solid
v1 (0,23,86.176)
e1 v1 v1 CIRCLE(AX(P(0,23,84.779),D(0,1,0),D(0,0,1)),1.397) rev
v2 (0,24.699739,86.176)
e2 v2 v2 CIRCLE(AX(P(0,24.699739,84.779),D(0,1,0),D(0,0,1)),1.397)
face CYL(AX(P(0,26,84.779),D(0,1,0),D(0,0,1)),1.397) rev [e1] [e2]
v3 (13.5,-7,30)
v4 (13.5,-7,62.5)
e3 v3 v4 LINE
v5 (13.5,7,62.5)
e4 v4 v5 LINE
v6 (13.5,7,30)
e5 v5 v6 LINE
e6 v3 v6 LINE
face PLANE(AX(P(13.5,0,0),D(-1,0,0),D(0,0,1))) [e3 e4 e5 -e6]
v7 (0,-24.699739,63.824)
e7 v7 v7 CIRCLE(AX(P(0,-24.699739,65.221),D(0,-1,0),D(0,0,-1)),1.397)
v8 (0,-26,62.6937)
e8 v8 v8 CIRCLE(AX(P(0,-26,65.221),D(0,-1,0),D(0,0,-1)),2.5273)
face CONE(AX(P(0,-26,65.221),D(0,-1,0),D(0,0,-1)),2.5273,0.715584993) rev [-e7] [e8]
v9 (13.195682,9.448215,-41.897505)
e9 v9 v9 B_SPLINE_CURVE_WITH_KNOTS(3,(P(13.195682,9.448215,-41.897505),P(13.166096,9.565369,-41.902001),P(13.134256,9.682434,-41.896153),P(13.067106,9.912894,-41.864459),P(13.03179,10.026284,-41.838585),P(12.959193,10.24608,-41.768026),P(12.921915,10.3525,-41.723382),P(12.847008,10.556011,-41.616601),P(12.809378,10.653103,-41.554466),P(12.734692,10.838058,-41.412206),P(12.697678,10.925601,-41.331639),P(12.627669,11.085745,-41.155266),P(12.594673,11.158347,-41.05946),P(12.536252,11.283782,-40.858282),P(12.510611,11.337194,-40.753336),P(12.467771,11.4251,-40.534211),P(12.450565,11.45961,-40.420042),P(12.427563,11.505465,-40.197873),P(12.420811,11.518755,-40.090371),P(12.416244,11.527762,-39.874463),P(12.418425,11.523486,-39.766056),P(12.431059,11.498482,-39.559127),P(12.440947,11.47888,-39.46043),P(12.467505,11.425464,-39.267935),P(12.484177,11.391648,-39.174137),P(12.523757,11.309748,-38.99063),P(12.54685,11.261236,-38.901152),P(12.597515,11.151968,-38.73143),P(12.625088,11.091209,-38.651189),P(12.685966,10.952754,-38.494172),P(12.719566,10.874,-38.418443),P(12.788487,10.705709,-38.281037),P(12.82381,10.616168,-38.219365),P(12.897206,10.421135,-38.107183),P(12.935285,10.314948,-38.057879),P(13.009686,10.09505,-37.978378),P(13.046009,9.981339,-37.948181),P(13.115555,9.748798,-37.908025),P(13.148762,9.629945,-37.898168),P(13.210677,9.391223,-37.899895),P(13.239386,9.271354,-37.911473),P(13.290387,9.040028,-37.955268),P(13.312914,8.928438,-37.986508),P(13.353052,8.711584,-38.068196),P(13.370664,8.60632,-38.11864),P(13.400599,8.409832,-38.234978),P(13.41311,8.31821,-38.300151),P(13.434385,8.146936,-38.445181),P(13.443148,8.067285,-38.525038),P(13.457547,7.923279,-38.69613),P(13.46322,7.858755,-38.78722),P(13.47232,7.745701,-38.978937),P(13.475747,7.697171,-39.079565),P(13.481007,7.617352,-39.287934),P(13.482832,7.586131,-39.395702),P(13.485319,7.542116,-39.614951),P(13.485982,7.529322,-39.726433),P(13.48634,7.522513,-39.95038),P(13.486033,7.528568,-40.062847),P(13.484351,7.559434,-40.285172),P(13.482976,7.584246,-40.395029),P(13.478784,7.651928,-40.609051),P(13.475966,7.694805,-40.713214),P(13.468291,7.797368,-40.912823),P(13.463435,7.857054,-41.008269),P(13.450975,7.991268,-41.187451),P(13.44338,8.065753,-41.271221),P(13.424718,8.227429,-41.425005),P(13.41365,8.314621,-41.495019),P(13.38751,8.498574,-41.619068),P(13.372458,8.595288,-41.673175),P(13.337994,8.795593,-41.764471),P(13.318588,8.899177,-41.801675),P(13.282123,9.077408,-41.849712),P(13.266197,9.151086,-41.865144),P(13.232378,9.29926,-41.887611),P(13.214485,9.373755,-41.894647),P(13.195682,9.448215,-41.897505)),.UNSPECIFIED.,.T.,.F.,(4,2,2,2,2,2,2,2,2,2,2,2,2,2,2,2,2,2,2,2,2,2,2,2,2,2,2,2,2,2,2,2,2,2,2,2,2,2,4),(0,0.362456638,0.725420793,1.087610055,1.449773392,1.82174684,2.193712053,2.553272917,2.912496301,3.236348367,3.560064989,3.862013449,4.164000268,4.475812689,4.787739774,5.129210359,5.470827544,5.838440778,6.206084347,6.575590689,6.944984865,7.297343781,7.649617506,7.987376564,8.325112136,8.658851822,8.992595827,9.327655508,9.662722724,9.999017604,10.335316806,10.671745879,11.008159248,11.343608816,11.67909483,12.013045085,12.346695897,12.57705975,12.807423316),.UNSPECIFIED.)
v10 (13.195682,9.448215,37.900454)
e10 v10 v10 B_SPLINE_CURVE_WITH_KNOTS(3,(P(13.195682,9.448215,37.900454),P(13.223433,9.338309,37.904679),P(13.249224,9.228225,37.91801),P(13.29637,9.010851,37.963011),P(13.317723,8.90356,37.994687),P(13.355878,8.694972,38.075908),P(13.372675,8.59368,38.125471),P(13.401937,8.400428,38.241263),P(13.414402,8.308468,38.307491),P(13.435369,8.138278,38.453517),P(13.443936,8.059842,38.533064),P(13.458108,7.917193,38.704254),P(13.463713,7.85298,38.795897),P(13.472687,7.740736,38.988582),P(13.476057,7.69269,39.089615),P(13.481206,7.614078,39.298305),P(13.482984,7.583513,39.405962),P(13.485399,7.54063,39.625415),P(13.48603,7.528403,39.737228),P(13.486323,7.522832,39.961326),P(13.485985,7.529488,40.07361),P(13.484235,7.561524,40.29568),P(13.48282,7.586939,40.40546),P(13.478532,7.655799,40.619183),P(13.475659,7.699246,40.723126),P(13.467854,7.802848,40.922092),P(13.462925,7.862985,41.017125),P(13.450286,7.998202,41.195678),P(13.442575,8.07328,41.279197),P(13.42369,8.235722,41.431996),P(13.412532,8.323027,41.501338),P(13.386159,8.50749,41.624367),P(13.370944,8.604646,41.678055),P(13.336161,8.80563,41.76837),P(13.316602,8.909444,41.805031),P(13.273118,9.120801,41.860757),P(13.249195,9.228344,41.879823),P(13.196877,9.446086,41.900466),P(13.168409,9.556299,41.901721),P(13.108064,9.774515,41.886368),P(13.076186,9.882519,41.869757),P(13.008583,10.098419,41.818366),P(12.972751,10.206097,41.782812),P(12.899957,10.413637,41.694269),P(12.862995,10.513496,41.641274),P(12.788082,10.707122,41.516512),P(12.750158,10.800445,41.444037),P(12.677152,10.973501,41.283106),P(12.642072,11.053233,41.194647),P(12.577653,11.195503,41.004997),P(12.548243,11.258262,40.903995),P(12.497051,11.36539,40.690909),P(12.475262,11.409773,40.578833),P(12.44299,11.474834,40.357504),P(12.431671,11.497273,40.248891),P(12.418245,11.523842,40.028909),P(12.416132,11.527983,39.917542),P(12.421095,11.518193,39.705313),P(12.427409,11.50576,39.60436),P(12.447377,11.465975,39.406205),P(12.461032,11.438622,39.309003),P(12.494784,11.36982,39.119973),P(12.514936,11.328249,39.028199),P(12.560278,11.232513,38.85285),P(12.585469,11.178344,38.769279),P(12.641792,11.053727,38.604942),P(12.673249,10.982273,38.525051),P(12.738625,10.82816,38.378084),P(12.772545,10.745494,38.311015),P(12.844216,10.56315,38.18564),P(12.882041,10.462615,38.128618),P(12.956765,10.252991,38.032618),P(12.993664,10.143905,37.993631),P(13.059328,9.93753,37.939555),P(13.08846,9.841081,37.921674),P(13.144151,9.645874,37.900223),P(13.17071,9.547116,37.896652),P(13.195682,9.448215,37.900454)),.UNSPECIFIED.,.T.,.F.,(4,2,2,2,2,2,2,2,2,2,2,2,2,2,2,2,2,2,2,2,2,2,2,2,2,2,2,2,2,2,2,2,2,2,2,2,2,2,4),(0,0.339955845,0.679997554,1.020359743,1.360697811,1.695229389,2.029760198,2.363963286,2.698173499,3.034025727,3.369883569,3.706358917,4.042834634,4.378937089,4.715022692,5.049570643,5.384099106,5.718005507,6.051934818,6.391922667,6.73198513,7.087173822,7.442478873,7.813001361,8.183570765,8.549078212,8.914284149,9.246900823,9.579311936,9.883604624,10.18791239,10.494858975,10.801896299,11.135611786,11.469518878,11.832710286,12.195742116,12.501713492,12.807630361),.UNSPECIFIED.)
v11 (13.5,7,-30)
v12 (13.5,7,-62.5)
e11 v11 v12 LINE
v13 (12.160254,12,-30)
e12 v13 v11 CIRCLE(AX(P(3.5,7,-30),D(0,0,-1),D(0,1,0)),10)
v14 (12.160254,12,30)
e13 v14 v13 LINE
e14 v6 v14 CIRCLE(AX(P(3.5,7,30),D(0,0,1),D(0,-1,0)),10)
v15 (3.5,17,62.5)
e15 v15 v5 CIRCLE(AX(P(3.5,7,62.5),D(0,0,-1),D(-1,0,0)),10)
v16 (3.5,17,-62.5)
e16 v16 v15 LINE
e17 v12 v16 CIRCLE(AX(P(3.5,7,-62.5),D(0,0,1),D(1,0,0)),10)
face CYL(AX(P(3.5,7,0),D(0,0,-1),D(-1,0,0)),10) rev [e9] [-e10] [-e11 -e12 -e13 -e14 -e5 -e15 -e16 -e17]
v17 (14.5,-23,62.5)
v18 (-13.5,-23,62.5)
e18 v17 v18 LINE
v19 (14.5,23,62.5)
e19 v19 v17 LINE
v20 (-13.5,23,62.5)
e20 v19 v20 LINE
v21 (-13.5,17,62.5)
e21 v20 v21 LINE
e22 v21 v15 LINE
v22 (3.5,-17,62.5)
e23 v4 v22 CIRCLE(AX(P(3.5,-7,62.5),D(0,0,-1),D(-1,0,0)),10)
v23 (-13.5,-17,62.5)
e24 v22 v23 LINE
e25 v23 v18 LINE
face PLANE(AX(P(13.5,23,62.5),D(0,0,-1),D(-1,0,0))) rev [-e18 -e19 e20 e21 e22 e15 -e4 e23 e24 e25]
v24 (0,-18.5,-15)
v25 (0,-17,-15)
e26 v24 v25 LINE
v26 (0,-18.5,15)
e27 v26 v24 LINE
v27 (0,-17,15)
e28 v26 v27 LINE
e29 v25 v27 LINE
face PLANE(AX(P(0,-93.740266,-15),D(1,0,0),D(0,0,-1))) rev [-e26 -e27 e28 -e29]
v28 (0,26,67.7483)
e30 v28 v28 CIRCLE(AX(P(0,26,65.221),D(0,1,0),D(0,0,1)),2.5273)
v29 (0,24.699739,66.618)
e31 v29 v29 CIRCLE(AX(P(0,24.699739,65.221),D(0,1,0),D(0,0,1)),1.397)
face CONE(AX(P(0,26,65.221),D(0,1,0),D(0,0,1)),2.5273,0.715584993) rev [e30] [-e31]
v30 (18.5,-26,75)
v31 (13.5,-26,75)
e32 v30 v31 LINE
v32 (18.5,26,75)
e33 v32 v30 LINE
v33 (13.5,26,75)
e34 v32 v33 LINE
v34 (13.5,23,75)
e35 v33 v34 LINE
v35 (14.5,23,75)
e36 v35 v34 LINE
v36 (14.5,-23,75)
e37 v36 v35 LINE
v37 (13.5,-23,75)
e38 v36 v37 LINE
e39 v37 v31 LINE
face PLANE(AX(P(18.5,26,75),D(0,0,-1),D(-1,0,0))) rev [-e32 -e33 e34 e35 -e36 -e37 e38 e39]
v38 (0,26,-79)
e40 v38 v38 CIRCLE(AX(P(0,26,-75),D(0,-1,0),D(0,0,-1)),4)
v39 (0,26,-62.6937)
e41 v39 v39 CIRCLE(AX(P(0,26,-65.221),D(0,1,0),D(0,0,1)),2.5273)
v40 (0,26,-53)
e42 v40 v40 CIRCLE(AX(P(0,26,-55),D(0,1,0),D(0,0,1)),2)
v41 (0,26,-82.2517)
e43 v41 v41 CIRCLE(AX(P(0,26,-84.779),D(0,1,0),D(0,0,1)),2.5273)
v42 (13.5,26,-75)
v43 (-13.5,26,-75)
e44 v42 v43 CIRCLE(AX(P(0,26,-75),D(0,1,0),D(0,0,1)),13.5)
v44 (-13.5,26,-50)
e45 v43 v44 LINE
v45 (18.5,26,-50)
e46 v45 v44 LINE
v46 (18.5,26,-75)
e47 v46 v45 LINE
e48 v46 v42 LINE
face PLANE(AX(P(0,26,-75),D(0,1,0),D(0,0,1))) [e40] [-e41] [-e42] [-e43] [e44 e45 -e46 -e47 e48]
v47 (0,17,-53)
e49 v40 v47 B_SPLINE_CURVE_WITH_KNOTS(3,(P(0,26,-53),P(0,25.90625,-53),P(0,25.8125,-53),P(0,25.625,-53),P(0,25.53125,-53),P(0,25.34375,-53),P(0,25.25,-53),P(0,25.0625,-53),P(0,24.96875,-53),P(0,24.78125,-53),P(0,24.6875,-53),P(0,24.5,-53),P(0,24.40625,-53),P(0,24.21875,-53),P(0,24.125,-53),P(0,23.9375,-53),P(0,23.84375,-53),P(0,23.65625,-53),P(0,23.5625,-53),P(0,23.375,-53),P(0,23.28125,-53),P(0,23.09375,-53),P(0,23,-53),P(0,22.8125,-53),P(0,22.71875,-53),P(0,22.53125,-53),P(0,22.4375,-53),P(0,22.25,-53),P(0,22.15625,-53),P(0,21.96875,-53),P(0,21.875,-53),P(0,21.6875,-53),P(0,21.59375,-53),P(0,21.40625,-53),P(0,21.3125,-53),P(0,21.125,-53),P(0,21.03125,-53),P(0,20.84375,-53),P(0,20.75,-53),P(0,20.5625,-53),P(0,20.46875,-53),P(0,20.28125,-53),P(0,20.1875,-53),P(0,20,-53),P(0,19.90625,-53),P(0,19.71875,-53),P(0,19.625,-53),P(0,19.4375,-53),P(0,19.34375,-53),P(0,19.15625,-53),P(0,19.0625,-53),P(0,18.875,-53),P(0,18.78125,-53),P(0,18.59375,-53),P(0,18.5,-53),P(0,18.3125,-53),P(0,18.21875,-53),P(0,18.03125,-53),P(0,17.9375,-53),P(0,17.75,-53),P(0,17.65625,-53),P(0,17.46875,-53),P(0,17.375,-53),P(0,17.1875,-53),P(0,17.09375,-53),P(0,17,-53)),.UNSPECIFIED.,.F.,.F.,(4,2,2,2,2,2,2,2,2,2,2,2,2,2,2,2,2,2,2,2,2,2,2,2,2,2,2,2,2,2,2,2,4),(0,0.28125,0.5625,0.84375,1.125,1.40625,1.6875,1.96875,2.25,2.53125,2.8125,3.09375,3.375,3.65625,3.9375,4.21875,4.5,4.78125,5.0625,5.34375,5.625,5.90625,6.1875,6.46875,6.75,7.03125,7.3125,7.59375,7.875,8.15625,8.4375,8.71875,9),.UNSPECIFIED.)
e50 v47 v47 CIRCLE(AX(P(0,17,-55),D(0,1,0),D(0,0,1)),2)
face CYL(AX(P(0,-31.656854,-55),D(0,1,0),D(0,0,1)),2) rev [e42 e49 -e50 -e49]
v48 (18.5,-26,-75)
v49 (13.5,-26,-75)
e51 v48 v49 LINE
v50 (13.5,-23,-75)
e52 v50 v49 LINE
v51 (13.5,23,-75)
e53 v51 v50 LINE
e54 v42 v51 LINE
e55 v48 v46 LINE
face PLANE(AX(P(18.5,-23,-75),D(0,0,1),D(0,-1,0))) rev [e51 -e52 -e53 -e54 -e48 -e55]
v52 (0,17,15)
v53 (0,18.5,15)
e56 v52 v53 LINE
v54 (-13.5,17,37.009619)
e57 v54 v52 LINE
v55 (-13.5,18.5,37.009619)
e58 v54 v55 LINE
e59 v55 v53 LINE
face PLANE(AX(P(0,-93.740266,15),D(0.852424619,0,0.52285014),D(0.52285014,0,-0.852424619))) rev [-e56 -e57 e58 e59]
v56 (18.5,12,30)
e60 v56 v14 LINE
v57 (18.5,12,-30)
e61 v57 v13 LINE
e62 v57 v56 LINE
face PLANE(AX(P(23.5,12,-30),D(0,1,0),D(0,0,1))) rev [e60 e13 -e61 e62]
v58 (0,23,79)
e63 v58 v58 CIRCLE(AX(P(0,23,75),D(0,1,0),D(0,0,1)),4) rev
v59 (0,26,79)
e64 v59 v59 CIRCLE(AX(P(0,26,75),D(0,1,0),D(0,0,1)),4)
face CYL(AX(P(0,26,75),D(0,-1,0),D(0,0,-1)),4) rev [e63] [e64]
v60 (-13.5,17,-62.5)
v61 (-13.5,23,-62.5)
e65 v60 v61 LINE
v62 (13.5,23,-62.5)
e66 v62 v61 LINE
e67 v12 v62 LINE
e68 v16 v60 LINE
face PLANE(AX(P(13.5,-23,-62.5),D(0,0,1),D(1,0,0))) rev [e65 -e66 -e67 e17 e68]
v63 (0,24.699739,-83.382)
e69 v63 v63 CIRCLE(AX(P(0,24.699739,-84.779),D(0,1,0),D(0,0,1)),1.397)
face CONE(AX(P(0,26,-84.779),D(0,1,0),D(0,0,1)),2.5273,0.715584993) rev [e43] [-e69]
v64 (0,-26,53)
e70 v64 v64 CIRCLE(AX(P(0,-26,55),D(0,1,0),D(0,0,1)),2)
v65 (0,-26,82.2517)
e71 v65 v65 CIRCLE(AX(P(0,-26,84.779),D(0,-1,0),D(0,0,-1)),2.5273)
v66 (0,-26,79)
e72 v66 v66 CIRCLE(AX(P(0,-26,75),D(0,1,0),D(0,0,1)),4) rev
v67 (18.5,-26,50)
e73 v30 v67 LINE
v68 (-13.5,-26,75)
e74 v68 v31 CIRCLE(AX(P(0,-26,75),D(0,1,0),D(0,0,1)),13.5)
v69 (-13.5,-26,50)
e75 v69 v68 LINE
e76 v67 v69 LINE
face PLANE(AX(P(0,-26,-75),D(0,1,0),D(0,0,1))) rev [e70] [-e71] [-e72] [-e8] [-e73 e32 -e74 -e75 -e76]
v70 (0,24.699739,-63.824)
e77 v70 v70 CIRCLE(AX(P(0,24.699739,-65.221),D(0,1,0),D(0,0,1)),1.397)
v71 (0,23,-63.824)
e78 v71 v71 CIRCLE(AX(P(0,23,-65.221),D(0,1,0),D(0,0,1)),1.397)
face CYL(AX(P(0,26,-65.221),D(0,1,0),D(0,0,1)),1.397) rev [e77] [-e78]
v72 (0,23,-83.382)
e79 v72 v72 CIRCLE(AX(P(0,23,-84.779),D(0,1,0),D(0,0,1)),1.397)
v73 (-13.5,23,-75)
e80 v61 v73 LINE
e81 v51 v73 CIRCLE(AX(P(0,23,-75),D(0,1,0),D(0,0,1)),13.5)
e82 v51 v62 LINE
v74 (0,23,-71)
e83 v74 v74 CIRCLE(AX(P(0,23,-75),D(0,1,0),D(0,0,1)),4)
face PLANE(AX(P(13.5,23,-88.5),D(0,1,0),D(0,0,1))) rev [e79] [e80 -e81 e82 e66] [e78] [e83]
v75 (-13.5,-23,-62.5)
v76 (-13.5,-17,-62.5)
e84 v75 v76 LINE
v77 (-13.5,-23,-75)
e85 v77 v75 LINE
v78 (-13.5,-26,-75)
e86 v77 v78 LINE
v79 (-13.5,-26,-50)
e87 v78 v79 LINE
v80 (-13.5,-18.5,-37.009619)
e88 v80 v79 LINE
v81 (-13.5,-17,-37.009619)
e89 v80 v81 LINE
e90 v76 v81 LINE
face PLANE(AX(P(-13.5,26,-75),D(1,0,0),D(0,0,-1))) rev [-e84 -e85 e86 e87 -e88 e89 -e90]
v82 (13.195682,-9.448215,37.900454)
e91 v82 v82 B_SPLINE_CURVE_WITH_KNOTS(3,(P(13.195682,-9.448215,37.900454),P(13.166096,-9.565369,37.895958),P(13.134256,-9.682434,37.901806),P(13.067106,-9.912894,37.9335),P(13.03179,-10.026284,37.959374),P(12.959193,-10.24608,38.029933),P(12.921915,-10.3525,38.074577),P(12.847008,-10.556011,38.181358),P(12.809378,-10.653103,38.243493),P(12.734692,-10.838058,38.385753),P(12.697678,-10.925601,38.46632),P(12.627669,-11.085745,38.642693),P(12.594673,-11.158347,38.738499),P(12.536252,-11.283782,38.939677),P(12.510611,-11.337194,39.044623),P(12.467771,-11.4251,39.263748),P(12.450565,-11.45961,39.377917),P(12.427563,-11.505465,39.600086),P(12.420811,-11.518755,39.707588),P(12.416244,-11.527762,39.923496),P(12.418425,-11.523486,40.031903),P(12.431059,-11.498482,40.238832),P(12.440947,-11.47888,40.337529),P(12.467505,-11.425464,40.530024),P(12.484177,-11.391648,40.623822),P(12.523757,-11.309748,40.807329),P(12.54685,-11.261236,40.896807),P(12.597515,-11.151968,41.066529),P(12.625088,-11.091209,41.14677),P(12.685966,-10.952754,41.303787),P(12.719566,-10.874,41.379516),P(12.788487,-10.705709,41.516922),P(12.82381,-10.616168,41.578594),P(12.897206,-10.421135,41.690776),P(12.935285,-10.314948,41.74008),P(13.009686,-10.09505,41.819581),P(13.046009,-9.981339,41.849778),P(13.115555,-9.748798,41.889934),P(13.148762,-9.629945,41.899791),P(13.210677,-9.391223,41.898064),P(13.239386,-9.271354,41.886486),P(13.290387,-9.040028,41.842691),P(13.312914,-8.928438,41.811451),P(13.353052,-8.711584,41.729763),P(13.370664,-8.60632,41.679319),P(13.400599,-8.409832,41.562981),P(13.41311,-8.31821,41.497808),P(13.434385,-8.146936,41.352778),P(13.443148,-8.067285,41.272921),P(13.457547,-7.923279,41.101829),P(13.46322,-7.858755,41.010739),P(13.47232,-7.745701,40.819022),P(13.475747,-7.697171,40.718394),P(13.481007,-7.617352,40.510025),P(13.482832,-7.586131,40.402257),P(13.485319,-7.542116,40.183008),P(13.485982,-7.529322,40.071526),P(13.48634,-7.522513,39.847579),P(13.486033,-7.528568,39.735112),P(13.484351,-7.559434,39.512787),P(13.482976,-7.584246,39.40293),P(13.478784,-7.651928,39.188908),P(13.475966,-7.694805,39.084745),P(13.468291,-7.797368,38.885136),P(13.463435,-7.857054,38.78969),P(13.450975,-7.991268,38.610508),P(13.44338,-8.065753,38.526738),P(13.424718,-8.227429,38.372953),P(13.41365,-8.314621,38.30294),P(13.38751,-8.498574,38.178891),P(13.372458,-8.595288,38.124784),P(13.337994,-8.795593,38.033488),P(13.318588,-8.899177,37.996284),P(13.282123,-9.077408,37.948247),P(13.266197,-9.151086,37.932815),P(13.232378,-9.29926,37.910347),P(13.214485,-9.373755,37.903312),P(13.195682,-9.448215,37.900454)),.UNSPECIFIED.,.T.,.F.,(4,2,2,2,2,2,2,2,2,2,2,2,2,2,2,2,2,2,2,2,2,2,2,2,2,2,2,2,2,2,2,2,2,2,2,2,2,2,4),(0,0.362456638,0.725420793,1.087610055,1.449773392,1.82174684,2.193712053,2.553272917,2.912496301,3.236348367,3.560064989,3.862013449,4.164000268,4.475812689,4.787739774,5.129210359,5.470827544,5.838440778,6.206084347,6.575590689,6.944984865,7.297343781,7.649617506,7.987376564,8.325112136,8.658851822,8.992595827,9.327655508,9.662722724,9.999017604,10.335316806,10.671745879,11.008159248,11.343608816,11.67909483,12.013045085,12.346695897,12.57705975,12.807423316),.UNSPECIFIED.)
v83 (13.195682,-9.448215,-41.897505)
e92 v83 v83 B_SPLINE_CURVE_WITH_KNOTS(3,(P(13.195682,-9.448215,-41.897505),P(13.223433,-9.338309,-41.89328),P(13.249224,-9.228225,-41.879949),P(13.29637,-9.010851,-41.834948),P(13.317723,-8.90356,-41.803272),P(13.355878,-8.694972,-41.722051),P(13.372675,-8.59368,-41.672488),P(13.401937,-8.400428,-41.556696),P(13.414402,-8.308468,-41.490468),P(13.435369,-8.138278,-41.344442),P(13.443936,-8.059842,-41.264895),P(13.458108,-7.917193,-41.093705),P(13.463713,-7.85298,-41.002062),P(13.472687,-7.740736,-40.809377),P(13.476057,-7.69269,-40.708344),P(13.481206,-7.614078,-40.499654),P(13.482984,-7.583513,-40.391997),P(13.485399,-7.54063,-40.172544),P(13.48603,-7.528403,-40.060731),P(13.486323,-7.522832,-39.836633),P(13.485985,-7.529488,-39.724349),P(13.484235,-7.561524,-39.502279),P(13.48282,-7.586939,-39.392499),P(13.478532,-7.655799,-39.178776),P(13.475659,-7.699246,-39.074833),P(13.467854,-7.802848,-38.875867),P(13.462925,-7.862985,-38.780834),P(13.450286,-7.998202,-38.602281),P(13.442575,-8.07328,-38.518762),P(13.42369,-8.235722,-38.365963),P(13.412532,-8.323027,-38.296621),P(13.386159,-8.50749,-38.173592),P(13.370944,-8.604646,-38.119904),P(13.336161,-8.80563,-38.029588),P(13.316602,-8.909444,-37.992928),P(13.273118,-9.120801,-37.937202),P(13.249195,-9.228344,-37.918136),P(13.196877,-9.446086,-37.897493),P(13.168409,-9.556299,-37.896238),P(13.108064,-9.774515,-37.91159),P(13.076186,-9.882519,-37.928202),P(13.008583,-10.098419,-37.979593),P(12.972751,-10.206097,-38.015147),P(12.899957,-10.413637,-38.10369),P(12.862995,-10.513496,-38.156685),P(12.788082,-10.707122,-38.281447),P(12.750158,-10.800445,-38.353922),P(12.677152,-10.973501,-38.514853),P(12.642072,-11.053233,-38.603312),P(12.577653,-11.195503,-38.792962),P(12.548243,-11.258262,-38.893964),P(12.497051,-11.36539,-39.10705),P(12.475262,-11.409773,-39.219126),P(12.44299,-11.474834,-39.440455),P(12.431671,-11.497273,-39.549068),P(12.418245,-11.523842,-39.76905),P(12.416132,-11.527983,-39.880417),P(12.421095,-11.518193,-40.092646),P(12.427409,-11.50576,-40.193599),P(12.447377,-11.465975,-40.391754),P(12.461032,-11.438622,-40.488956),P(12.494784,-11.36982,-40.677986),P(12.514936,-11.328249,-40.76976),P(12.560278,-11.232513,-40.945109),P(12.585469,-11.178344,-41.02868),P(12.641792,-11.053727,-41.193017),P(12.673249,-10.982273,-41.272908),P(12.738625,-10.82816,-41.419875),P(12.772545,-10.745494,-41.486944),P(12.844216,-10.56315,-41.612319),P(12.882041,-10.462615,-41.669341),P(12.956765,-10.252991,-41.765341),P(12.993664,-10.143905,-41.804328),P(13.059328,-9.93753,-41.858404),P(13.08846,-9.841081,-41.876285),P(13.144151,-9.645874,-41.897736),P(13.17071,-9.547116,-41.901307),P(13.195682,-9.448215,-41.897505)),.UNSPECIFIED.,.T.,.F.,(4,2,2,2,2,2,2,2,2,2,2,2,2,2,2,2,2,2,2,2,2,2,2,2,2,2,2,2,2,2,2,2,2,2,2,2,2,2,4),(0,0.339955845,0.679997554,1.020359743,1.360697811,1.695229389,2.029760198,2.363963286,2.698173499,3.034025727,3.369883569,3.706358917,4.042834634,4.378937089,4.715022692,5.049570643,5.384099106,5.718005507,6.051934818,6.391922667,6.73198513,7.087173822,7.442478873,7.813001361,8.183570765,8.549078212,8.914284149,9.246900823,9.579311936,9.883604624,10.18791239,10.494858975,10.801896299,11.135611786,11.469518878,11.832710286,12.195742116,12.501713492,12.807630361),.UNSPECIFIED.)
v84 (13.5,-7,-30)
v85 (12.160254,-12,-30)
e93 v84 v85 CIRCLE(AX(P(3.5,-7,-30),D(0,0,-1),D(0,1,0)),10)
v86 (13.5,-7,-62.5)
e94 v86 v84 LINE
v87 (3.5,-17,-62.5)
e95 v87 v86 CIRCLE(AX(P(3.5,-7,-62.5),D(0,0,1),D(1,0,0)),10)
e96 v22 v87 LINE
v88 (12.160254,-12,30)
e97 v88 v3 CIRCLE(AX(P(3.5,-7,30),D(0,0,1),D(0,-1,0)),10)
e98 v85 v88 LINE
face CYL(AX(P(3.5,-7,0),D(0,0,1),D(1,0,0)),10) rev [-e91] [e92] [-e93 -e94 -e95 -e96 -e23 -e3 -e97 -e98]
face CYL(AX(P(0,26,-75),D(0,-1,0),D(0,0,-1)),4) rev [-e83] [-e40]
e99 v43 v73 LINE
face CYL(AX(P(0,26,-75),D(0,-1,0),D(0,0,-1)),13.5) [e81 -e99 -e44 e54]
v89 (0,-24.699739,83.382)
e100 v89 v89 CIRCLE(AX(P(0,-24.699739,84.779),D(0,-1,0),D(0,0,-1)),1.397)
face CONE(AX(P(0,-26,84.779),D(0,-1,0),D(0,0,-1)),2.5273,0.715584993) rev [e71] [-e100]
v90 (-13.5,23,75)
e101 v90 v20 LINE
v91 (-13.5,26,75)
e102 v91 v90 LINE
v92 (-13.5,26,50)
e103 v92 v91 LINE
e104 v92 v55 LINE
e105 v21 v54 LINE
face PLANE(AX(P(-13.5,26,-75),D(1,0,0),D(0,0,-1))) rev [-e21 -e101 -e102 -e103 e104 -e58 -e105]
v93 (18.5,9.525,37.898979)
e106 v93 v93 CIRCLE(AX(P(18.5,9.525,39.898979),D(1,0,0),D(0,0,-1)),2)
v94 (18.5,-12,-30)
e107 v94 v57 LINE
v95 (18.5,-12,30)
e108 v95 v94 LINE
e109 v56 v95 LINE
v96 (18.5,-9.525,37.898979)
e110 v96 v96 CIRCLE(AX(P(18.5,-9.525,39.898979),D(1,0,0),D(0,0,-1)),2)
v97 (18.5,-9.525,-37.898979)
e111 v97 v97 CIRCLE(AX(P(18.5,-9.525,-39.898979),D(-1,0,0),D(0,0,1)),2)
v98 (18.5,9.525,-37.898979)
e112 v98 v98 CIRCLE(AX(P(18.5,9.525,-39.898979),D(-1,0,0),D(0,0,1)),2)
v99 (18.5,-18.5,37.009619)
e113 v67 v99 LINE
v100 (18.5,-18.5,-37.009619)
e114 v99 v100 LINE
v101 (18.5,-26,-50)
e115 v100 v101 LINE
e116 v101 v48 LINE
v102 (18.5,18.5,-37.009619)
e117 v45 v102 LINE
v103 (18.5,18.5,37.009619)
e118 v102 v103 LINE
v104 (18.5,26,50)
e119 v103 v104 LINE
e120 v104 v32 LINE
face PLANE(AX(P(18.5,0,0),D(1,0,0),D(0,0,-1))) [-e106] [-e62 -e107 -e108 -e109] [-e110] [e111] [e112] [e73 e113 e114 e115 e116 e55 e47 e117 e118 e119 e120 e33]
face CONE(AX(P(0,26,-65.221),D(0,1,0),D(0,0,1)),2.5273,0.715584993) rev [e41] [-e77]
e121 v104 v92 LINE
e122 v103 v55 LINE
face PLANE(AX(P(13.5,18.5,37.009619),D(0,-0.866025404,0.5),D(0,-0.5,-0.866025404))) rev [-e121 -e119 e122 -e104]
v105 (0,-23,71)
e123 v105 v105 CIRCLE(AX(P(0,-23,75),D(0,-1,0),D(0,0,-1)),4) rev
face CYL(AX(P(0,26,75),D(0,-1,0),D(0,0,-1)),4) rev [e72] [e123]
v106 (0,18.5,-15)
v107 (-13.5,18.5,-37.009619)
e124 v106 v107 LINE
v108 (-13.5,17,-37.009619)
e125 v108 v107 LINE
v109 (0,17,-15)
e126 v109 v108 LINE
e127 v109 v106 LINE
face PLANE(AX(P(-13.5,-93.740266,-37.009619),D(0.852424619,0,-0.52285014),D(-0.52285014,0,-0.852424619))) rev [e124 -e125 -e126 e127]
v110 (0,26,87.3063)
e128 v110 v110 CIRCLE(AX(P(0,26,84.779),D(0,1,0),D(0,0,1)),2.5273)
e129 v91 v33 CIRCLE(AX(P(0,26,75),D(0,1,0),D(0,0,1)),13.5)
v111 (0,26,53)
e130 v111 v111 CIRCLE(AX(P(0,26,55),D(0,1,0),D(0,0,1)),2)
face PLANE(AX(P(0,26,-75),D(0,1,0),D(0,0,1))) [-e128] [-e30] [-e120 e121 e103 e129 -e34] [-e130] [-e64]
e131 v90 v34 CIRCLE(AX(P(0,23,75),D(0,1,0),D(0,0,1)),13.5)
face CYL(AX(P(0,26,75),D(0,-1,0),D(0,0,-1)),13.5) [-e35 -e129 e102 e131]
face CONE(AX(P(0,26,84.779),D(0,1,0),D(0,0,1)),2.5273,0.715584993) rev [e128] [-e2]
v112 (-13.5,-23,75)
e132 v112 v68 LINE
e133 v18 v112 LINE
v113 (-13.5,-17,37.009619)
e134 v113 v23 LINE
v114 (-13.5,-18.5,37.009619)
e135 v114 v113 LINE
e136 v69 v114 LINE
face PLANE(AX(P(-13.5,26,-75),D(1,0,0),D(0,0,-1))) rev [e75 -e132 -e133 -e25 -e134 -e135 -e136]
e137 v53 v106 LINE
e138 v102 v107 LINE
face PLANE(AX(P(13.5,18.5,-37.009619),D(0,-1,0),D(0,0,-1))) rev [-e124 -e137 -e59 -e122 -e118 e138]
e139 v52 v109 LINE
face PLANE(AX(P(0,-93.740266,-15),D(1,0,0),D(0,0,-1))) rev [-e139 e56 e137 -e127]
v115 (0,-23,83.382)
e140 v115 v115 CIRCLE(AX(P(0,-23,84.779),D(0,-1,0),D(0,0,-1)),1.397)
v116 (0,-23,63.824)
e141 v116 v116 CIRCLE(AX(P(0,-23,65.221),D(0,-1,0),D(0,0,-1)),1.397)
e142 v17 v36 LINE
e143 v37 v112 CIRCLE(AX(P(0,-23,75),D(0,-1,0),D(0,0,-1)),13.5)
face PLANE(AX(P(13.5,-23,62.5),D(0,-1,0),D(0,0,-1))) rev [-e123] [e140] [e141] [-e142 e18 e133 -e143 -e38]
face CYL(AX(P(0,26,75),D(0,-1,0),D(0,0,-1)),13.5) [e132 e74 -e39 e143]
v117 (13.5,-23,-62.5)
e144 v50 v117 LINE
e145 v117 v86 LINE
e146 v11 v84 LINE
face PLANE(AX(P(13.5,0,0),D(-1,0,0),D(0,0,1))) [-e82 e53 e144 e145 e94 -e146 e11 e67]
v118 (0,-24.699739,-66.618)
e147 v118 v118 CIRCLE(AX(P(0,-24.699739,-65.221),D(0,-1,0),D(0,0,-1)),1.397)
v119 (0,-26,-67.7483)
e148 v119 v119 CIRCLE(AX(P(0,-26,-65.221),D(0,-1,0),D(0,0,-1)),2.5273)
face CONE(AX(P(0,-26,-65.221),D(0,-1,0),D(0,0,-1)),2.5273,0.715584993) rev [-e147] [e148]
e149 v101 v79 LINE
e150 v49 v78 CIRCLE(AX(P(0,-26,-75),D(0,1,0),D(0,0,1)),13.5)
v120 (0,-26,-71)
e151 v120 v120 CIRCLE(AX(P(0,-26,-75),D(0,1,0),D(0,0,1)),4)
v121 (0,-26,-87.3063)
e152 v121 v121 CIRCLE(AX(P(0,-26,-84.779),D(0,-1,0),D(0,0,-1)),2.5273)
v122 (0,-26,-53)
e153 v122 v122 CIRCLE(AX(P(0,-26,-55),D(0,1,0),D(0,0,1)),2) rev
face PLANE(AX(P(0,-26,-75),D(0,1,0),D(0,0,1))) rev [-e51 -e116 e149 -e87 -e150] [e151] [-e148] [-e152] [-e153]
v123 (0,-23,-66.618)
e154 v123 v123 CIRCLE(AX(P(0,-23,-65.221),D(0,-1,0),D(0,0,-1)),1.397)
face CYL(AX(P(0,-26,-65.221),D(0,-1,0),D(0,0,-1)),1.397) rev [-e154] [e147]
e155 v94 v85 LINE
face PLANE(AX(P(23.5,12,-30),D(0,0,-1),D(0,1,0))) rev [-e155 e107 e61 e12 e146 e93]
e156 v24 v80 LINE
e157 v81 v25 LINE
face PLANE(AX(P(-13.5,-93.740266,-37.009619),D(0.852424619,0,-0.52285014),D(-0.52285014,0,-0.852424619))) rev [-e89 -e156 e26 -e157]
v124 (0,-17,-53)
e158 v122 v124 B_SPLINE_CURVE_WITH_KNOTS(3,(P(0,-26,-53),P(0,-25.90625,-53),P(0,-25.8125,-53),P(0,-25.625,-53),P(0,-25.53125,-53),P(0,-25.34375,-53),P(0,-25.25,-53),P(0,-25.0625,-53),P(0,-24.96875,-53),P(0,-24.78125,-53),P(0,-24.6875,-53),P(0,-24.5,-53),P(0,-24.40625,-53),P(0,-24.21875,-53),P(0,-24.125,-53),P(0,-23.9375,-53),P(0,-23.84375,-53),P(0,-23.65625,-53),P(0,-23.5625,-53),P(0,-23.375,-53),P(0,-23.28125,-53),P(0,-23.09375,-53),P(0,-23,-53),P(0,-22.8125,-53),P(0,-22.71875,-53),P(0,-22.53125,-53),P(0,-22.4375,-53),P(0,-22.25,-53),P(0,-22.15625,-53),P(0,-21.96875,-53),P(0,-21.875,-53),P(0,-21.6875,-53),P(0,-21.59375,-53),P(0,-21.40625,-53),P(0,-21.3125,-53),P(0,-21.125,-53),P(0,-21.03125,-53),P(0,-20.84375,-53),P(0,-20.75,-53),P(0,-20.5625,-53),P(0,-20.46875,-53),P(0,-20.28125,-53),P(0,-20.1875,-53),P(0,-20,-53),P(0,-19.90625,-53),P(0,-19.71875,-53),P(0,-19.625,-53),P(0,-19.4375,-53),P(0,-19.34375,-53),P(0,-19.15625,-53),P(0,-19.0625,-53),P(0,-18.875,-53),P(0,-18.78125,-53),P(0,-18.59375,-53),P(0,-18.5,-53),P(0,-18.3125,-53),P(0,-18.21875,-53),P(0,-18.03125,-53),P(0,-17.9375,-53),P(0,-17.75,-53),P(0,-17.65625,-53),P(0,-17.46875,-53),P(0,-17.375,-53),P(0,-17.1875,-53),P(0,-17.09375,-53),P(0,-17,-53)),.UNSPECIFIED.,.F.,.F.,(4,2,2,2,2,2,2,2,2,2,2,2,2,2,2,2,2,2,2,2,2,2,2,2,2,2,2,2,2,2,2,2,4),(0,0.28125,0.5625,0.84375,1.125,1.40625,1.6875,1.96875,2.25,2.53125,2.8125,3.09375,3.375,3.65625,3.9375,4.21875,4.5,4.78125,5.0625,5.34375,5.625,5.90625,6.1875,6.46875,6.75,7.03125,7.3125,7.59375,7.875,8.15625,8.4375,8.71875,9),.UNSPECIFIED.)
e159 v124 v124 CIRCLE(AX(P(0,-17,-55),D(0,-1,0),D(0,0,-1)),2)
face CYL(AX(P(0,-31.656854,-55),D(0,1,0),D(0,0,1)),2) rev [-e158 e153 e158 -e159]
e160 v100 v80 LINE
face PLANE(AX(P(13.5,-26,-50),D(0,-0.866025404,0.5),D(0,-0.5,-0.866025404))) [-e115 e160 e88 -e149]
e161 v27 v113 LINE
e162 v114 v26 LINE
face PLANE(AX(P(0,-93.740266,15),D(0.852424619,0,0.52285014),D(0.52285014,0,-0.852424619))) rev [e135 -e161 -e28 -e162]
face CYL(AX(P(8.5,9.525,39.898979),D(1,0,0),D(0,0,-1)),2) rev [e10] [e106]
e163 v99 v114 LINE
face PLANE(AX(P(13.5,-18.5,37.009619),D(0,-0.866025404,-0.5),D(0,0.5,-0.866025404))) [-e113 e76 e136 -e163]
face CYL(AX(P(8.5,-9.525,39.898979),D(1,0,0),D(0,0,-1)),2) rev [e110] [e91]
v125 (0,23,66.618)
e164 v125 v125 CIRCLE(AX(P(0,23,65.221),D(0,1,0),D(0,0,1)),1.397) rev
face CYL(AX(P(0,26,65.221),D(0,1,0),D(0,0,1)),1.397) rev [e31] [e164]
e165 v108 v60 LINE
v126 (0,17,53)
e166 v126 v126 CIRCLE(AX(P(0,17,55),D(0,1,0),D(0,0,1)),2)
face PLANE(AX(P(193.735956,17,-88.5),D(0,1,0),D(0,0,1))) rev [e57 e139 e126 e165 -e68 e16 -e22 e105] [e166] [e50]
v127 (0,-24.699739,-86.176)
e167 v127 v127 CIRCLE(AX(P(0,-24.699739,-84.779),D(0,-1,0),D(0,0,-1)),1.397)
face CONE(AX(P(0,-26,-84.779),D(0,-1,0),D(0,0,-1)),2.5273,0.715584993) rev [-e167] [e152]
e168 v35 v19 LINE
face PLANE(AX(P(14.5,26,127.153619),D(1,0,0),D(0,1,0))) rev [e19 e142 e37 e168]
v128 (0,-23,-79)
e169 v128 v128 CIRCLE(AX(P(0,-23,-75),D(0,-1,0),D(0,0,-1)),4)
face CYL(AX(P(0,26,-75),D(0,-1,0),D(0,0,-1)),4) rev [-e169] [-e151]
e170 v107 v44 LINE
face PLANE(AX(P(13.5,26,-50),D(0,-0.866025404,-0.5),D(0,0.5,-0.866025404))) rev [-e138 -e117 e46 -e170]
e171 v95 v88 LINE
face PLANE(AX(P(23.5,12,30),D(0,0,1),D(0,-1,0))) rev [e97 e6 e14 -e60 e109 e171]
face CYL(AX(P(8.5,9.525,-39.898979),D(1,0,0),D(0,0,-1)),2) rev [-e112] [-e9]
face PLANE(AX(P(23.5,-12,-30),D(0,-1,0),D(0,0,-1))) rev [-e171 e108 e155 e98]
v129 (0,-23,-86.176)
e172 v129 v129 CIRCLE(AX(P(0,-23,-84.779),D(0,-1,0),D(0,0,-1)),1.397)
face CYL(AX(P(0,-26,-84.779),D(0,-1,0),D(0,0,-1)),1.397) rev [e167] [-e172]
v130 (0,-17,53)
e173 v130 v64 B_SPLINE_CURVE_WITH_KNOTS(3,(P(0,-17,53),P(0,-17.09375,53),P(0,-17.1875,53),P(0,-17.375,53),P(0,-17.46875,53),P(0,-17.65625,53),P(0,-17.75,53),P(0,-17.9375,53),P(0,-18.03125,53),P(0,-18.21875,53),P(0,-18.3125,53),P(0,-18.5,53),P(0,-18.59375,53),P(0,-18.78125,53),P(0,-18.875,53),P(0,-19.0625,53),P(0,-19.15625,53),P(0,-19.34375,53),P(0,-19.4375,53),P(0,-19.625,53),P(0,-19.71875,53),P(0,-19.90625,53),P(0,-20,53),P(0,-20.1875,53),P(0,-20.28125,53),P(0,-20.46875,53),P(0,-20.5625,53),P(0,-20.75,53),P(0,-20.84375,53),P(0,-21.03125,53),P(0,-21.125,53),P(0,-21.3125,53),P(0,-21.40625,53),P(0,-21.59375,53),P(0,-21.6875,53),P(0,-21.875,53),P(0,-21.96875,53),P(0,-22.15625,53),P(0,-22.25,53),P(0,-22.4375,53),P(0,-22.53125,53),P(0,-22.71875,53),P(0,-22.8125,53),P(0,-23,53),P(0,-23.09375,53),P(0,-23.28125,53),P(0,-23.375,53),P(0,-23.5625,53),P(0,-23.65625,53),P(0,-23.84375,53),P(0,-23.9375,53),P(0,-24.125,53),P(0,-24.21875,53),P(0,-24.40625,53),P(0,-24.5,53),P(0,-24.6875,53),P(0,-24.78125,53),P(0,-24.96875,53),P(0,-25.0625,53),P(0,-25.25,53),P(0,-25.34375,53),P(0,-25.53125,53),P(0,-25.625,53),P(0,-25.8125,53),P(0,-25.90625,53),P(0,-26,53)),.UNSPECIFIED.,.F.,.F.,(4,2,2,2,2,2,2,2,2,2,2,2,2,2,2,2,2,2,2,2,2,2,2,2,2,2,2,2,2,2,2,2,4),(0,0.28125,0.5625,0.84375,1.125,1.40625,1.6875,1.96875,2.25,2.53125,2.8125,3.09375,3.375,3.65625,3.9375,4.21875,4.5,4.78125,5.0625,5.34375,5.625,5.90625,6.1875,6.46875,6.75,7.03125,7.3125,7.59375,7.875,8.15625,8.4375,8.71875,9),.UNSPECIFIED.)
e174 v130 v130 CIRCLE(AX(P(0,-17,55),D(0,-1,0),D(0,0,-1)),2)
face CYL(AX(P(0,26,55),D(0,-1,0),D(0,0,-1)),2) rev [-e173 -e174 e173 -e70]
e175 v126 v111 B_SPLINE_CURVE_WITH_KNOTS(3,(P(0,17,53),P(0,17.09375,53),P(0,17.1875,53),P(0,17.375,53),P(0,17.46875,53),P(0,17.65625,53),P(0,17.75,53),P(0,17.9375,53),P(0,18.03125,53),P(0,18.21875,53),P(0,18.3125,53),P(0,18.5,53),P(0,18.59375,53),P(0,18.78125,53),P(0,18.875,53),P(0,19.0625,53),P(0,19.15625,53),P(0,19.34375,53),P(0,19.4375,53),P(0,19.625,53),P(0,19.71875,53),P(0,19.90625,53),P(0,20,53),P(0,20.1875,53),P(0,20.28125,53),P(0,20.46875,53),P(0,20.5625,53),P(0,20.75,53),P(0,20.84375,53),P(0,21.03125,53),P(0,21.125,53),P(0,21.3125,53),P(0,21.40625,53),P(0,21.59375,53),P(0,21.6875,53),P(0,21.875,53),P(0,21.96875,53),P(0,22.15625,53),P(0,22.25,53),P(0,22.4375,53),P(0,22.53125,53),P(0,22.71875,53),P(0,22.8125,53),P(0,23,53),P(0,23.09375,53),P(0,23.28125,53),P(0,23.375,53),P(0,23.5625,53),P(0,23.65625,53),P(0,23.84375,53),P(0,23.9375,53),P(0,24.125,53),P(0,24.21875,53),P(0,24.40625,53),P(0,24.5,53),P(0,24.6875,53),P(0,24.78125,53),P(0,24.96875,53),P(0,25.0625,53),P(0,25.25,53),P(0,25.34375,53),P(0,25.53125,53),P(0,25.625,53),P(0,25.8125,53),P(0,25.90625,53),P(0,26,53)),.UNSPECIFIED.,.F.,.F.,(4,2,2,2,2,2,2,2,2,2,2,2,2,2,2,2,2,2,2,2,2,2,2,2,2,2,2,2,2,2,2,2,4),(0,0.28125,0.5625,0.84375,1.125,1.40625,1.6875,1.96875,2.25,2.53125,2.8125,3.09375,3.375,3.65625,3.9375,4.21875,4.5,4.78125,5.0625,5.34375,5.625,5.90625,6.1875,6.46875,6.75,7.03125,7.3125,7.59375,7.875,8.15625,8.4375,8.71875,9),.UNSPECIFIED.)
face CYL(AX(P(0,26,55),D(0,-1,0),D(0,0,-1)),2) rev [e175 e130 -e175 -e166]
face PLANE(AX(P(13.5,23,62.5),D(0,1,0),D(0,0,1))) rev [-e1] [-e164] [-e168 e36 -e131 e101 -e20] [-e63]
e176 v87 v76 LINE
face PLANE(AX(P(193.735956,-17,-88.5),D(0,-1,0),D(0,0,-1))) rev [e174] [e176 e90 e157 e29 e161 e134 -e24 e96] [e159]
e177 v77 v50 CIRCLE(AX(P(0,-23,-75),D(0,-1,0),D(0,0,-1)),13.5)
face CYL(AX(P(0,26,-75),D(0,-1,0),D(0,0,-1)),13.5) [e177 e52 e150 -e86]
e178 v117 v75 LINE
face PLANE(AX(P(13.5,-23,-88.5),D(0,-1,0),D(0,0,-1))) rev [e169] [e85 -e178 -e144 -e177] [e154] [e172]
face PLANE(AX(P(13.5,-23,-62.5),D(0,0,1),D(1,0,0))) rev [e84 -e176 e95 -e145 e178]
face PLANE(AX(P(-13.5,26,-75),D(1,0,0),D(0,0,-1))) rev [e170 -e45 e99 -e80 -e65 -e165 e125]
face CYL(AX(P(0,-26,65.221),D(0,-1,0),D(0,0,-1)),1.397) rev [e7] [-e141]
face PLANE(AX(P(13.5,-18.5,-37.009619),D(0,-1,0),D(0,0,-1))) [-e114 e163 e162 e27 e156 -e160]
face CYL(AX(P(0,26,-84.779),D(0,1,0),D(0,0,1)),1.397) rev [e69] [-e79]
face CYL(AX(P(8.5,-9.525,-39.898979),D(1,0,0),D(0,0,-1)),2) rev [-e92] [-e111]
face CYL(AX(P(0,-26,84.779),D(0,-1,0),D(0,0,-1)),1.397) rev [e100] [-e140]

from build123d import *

# Parameters (mm, degrees)
SKETCH1_R                                     = 2
BOSS_EXTRUDE1_DEPTH                           = 26
CUT_EXTRUDE1_DEPTH                            = 97.110613358
CUT_EXTRUDE2_DEPTH                            = 97.110613358
CUT_EXTRUDE2_DEPTH_BACK                       = 97.110613358
SKETCH4_W                                     = 26
SKETCH4_H                                     = 6
SKETCH5_W                                     = 177
SKETCH5_H                                     = 34
CUT_EXTRUDE3_DEPTH                            = 22
SKETCH6_W                                     = 22.988088482
SKETCH6_H                                     = 34
CUT_EXTRUDE4_DEPTH                            = 95.827474922
SKETCH7_W                                     = 22.988088482
SKETCH7_H                                     = 34
CUT_EXTRUDE5_DEPTH                            = 95.827474922
CSK_FOR_3_FLAT_HEAD_MACHINE_SCREW1_AT_2_COUNT = 2
CSK_FOR_3_FLAT_HEAD_MACHINE_SCREW1_AT_2_PITCH = 19.558
SKETCH13_R                                    = 4
CUT_EXTRUDE6_DEPTH                            = 104.530188834
BOSS_EXTRUDE2_DEPTH                           = 5
SKETCH15_W                                    = 125
SKETCH15_H                                    = 34
CUT_EXTRUDE7_DEPTH                            = 5
SKETCH17_W                                    = 4
SKETCH17_H                                    = 52
BOSS_EXTRUDE4_DEPTH                           = 12.5
SKETCH19_R                                    = 2
CUT_EXTRUDE11_DEPTH                           = 10
CUT_EXTRUDE8_REACH                            = 106.3
SKETCH18_R                                    = 2
SKETCH20_W                                    = 60
SKETCH20_H                                    = 24
CUT_EXTRUDE10_DEPTH                           = 10
CUT_EXTRUDE12_REACH                           = 102.771
SKETCH22_W                                    = 5
SKETCH22_H                                    = 46
BOSS_EXTRUDE5_DEPTH                           = 12.5
FILLET1_R                                     = 10


with BuildPart() as part:
    # Sketch1 → Boss-Extrude1 (new, symmetric)
    with BuildSketch(Plane(origin=(0, 0, 0), x_dir=(1, 0, 0), z_dir=(0, 1, 0))):
        with BuildLine():
            Line((-13.5, 75), (-13.5, -75))
            ThreePointArc((-13.5, -75), (0, -88.5), (13.5, -75))
            Line((13.5, -75), (13.5, 75))
            ThreePointArc((13.5, 75), (0, 88.5), (-13.5, 75))
        make_face()
        with Locations(Location((0, -55, 0), (0, 0, 90))):
            Circle(SKETCH1_R, mode=Mode.SUBTRACT)
    extrude(amount=BOSS_EXTRUDE1_DEPTH, both=True)

    # Sketch3 → Cut-Extrude1 (cut, symmetric)
    with BuildSketch(Plane.ZY.offset(13.5)):
        Polygon((-50, 26), (-37.009618943, 18.5), (37.009618943, 18.5), (50, 26), align=None)
    cut_extrude1 = extrude(amount=CUT_EXTRUDE1_DEPTH, both=True, mode=Mode.SUBTRACT)

    # Mirror1: Cut-Extrude1 across plane
    add(cut_extrude1.mirror(Plane.ZX), mode=Mode.SUBTRACT)

    # Sketch4 → Cut-Extrude2 (cut, two sides: drawn at the far end of the back side and taken through both)
    with BuildSketch(Plane.ZY.offset(13.5).offset(-CUT_EXTRUDE2_DEPTH_BACK)):
        with Locations((75.5, 20)):
            Rectangle(SKETCH4_W, SKETCH4_H)
        with Locations((-75.5, 20)):
            Rectangle(SKETCH4_W, SKETCH4_H)
        with Locations((-75.5, -20)):
            Rectangle(SKETCH4_W, SKETCH4_H)
        with Locations((75.5, -20)):
            Rectangle(SKETCH4_W, SKETCH4_H)
    extrude(amount=CUT_EXTRUDE2_DEPTH + CUT_EXTRUDE2_DEPTH_BACK, mode=Mode.SUBTRACT)

    # Sketch5 → Cut-Extrude3 (cut)
    with BuildSketch(Plane.ZY.offset(13.5)):
        Rectangle(SKETCH5_W, SKETCH5_H)
    extrude(amount=-CUT_EXTRUDE3_DEPTH, mode=Mode.SUBTRACT)

    # Sketch6 → Cut-Extrude4 (cut, through all)
    with BuildSketch(Plane.ZY.offset(-8.5)):
        with Locations((73.994044241, 0)):
            Rectangle(SKETCH6_W, SKETCH6_H)
    extrude(amount=-CUT_EXTRUDE4_DEPTH, mode=Mode.SUBTRACT)

    # Sketch7 → Cut-Extrude5 (cut, through all)
    with BuildSketch(Plane.ZY.offset(-8.5)):
        with Locations((-73.994044241, 0)):
            Rectangle(SKETCH7_W, SKETCH7_H)
    extrude(amount=-CUT_EXTRUDE5_DEPTH, mode=Mode.SUBTRACT)

    # Sketch12 → CSK for #3 Flat Head Machine Screw1 (revolve, cut)
    with BuildSketch(Plane(origin=(0, 26, 65.221), x_dir=(0, 0, 1), z_dir=(1, 0, 0))):
        Polygon((0, 0), (0, 3.839402285), (1.397, 3), (1.397, 1.300261411), (2.5273, 0), align=None)
    csk_for_3_flat_head_machine_screw1 = revolve(axis=Axis((0, 32.35, 65.221), (0, -1, 0)), mode=Mode.SUBTRACT)

    # CSK for #3 Flat Head Machine Screw1 at 2: CSK for #3 Flat Head Machine Screw1 ×2
    with Locations(*[(0, 0, i * CSK_FOR_3_FLAT_HEAD_MACHINE_SCREW1_AT_2_PITCH) for i in range(1, CSK_FOR_3_FLAT_HEAD_MACHINE_SCREW1_AT_2_COUNT)]):
        add(csk_for_3_flat_head_machine_screw1, mode=Mode.SUBTRACT)

    # Mirror5: CSK for #3 Flat Head Machine Screw1 across plane
    add(csk_for_3_flat_head_machine_screw1.mirror(Plane.ZX), mode=Mode.SUBTRACT)

    # Mirror5 copy 1 sketch → Mirror5 copy 1 (revolve, cut)
    with BuildSketch(Plane(origin=(0, -26, 84.779), x_dir=(0, 0, 1), z_dir=(1, 0, 0))):
        Polygon((0, 0), (0, -3.839402285), (1.397, -3), (1.397, -1.300261411), (2.5273, 0), align=None)
    revolve(axis=Axis((0, -32.35, 84.779), (0, -1, 0)), mode=Mode.SUBTRACT)

    # Mirror3: CSK for #3 Flat Head Machine Screw1 across plane
    add(csk_for_3_flat_head_machine_screw1.mirror(Plane.XY), mode=Mode.SUBTRACT)

    # Mirror3 copy 1 sketch → Mirror3 copy 1 (revolve, cut)
    with BuildSketch(Plane(origin=(0, 26, -84.779), x_dir=(0, 0, -1), z_dir=(1, 0, 0))):
        Polygon((0, 0), (0, -3.839402285), (1.397, -3), (1.397, -1.300261411), (2.5273, 0), align=None)
    revolve(axis=Axis((0, 32.35, -84.779), (0, 1, 0)), mode=Mode.SUBTRACT)

    # Sketch13 → Cut-Extrude6 (cut, symmetric)
    with BuildSketch(Plane.XZ.offset(26)):
        with Locations(Location((0, -75, 0), (0, 0, 270))):
            Circle(SKETCH13_R)
    cut_extrude6 = extrude(amount=CUT_EXTRUDE6_DEPTH, both=True, mode=Mode.SUBTRACT)

    # Mirror4: Cut-Extrude6 across plane
    add(cut_extrude6.mirror(Plane.XY), mode=Mode.SUBTRACT)

    # Sketch14 → Boss-Extrude2 (add)
    with BuildSketch(Plane(origin=(13.5, 0, 0), x_dir=(0, 0, -1), z_dir=(1, 0, 0))):
        Polygon((-75, 26), (-75, 23), (-62.5, 23), (-62.5, -23), (-75, -23), (-75, -26), (-50, -26), (-37.009618943, -18.5), (37.009618943, -18.5), (50, -26), (75, -26), (75, -23), (62.5, -23), (62.5, 23), (75, 23), (75, 26), (50, 26), (37.009618943, 18.5), (-37.009618943, 18.5), (-50, 26), align=None)
    extrude(amount=BOSS_EXTRUDE2_DEPTH)

    # Sketch15 → Cut-Extrude7 (cut)
    with BuildSketch(Plane.ZY.offset(-8.5)):
        Rectangle(SKETCH15_W, SKETCH15_H)
    extrude(amount=-CUT_EXTRUDE7_DEPTH, mode=Mode.SUBTRACT)

    # Sketch17 → Boss-Extrude4 (add)
    with BuildSketch(Plane.XY.offset(62.5)):
        with Locations((16.5, 0)):
            Rectangle(SKETCH17_W, SKETCH17_H)
    extrude(amount=BOSS_EXTRUDE4_DEPTH)

    # Mirror6 copy 1 sketch → Mirror6 copy 1 (revolve, cut)
    with BuildSketch(Plane(origin=(0, -26, -65.221), x_dir=(0, 0, -1), z_dir=(1, 0, 0))):
        Polygon((0, 0), (0, 3.839402285), (1.397, 3), (1.397, 1.300261411), (2.5273, 0), align=None)
    revolve(axis=Axis((0, -32.35, -65.221), (0, 1, 0)), mode=Mode.SUBTRACT)

    # Mirror6 copy 2 sketch → Mirror6 copy 2 (revolve, cut)
    with BuildSketch(Plane(origin=(0, -26, -84.779), x_dir=(0, 0, -1), z_dir=(1, 0, 0))):
        Polygon((0, 0), (0, 3.839402285), (1.397, 3), (1.397, 1.300261411), (2.5273, 0), align=None)
    revolve(axis=Axis((0, -32.35, -84.779), (0, 1, 0)), mode=Mode.SUBTRACT)

    # Mirror6 copy 3 sketch → Mirror6 copy 3 (revolve, cut)
    with BuildSketch(Plane(origin=(0, -26, 65.221), x_dir=(0, 0, 1), z_dir=(1, 0, 0))):
        Polygon((0, 0), (0, -3.839402285), (1.397, -3), (1.397, -1.300261411), (2.5273, 0), align=None)
    revolve(axis=Axis((0, -32.35, 65.221), (0, -1, 0)), mode=Mode.SUBTRACT)

    # Mirror6 copy 4 sketch → Mirror6 copy 4 (revolve, cut)
    with BuildSketch(Plane(origin=(0, -26, 84.779), x_dir=(0, 0, 1), z_dir=(1, 0, 0))):
        Polygon((0, 0), (0, -3.839402285), (1.397, -3), (1.397, -1.300261411), (2.5273, 0), align=None)
    revolve(axis=Axis((0, -32.35, 84.779), (0, -1, 0)), mode=Mode.SUBTRACT)

    # Sketch19 → Cut-Extrude11 (cut)
    with BuildSketch(Plane(origin=(18.5, 0, 0), x_dir=(0, 0, -1), z_dir=(1, 0, 0))):
        with Locations((-39.898979486, 9.525)):
            Circle(SKETCH19_R)
        with Locations((-39.898979486, -9.525)):
            Circle(SKETCH19_R)
    cut_extrude11 = extrude(amount=-CUT_EXTRUDE11_DEPTH, mode=Mode.SUBTRACT)

    # Cut-Extrude8: up to this face of the body (flat: up to its plane)
    cut_extrude8_end = Plane(part.part.faces().sort_by_distance((0, -26, -87.99937539))[0])
    # Sketch18 → Cut-Extrude8 (cut, up to the picked face)
    with BuildSketch(Plane(origin=(0, 26, 0), x_dir=(1, 0, 0), z_dir=(0, 1, 0)), mode=Mode.PRIVATE) as cut_extrude8_sk1:
        with Locations(Location((0, 55, 0), (0, 0, 270))):
            Circle(SKETCH18_R)
    cut_extrude8_tool1 = split(extrude(cut_extrude8_sk1.sketch, amount=-CUT_EXTRUDE8_REACH, mode=Mode.PRIVATE), bisect_by=cut_extrude8_end, keep=Keep.BOTH, mode=Mode.PRIVATE)
    add(cut_extrude8_tool1.solids().sort_by(Axis((0, 26, -55), (0, -1, 0)))[0], mode=Mode.SUBTRACT)

    # Sketch20 → Cut-Extrude10 (cut)
    with BuildSketch(Plane.ZY.offset(-13.5)):
        Rectangle(SKETCH20_W, SKETCH20_H)
    extrude(amount=-CUT_EXTRUDE10_DEPTH, mode=Mode.SUBTRACT)

    # Mirror7: Cut-Extrude11 across plane
    add(cut_extrude11.mirror(Plane.XY), mode=Mode.SUBTRACT)

    # Sketch21 → Cut-Extrude12 (cut, up to next)
    with BuildSketch(Plane(origin=(0, 18.5, 0), x_dir=(1, 0, 0), z_dir=(0, 1, 0)), mode=Mode.PRIVATE) as cut_extrude12_sk1:
        Polygon((-13.5, 37.009618943), (0, 15), (0, -15), (-13.5, -37.009618943), align=None)
    cut_extrude12_tool1 = extrude(cut_extrude12_sk1.sketch, amount=-CUT_EXTRUDE12_REACH, mode=Mode.PRIVATE) & part.part
    add(cut_extrude12_tool1.solids().sort_by_distance((-7.702163, 18.5, 0))[0], mode=Mode.SUBTRACT)
    add(cut_extrude12_tool1.solids().sort_by_distance((-7.702163, 18.5, 0))[1], mode=Mode.SUBTRACT)

    # Sketch22 → Boss-Extrude5 (add)
    with BuildSketch(Plane(origin=(0, 0, -62.5), x_dir=(-1, 0, 0), z_dir=(0, 0, -1))):
        with Locations((-16, 0)):
            Rectangle(SKETCH22_W, SKETCH22_H)
    extrude(amount=BOSS_EXTRUDE5_DEPTH)

    # Fillet1
    # the kernel refuses this fillet: 10 mm, written as the material it adds along each edge
    with BuildSketch(Plane(origin=(13.5, 17, -62.5), x_dir=(0, -1, 0), z_dir=(0, 0, 1))) as fillet1_piece_1_section:
        with BuildLine():
            CenterArc((FILLET1_R, -FILLET1_R), FILLET1_R, 90, 90)
            Line((0, -FILLET1_R), (0, 0))
            Line((0, 0), (FILLET1_R, 0))
        make_face()
    fillet1_piece_1 = extrude(amount=150, mode=Mode.PRIVATE)
    fillet1_piece_1 = fillet1_piece_1 - Plane(origin=(13.095089825, 9.525, -39.898979486), x_dir=(0, 0, 1), z_dir=(1, 0, 0)) * Cylinder(2, 341, mode=Mode.PRIVATE)
    fillet1_piece_1 = split(fillet1_piece_1, bisect_by=Plane(origin=(13.095089825, 10.807057583, -30), z_dir=(0, 0, -1)), keep=Keep.TOP, mode=Mode.PRIVATE)
    add(fillet1_piece_1)
    with BuildSketch(Plane(origin=(13.5, 17, -62.5), x_dir=(0, -1, 0), z_dir=(0, 0, 1))) as fillet1_piece_2_section:
        with BuildLine():
            CenterArc((FILLET1_R, -FILLET1_R), FILLET1_R, 90, 90)
            Line((0, -FILLET1_R), (0, 0))
            Line((0, 0), (FILLET1_R, 0))
        make_face()
    fillet1_piece_2 = extrude(amount=125, mode=Mode.PRIVATE)
    fillet1_piece_2 = split(fillet1_piece_2, bisect_by=Plane(origin=(11.059751506, 12, 0), z_dir=(0, 1, 0)), keep=Keep.TOP, mode=Mode.PRIVATE)
    add(fillet1_piece_2)
    with BuildSketch(Plane(origin=(13.5, 17, -87.5), x_dir=(0, -1, 0), z_dir=(0, 0, 1))) as fillet1_piece_3_section:
        with BuildLine():
            CenterArc((FILLET1_R, -FILLET1_R), FILLET1_R, 90, 90)
            Line((0, -FILLET1_R), (0, 0))
            Line((0, 0), (FILLET1_R, 0))
        make_face()
    fillet1_piece_3 = extrude(amount=150, mode=Mode.PRIVATE)
    fillet1_piece_3 = fillet1_piece_3 - Plane(origin=(13.095089825, 9.525, 39.898979486), x_dir=(0, 0, -1), z_dir=(1, 0, 0)) * Cylinder(2, 341, mode=Mode.PRIVATE)
    fillet1_piece_3 = split(fillet1_piece_3, bisect_by=Plane(origin=(13.095089825, 10.807057583, 30), z_dir=(0, 0, 1)), keep=Keep.TOP, mode=Mode.PRIVATE)
    add(fillet1_piece_3)
    with BuildSketch(Plane(origin=(13.5, -17, 62.5), x_dir=(-1, 0, 0), z_dir=(0, 0, -1))) as fillet1_piece_4_section:
        with BuildLine():
            CenterArc((FILLET1_R, FILLET1_R), FILLET1_R, 180, 90)
            Line((0, FILLET1_R), (0, 0))
            Line((0, 0), (FILLET1_R, 0))
        make_face()
    fillet1_piece_4 = extrude(amount=125, mode=Mode.PRIVATE)
    fillet1_piece_4 = split(fillet1_piece_4, bisect_by=Plane(origin=(11.059751506, -12, 46.25), z_dir=(0, -1, 0)), keep=Keep.TOP, mode=Mode.PRIVATE)
    add(fillet1_piece_4)
    with BuildSketch(Plane(origin=(13.5, -17, 62.5), x_dir=(-1, 0, 0), z_dir=(0, 0, -1))) as fillet1_piece_5_section:
        with BuildLine():
            CenterArc((FILLET1_R, FILLET1_R), FILLET1_R, 180, 90)
            Line((0, FILLET1_R), (0, 0))
            Line((0, 0), (FILLET1_R, 0))
        make_face()
    fillet1_piece_5 = extrude(amount=150, mode=Mode.PRIVATE)
    fillet1_piece_5 = split(fillet1_piece_5, bisect_by=Plane(origin=(13.095085978, -10.807036513, 30), z_dir=(0, 0, 1)), keep=Keep.TOP, mode=Mode.PRIVATE)
    fillet1_piece_5 = fillet1_piece_5 - Plane(origin=(13.095085978, -9.525, 39.898979486), x_dir=(0, 0, -1), z_dir=(1, 0, 0)) * Cylinder(2, 341, mode=Mode.PRIVATE)
    add(fillet1_piece_5)
    with BuildSketch(Plane(origin=(13.5, -17, 87.5), x_dir=(-1, 0, 0), z_dir=(0, 0, -1))) as fillet1_piece_6_section:
        with BuildLine():
            CenterArc((FILLET1_R, FILLET1_R), FILLET1_R, 180, 90)
            Line((0, FILLET1_R), (0, 0))
            Line((0, 0), (FILLET1_R, 0))
        make_face()
    fillet1_piece_6 = extrude(amount=150, mode=Mode.PRIVATE)
    fillet1_piece_6 = split(fillet1_piece_6, bisect_by=Plane(origin=(13.095085978, -10.807036513, -30), z_dir=(0, 0, -1)), keep=Keep.TOP, mode=Mode.PRIVATE)
    fillet1_piece_6 = fillet1_piece_6 - Plane(origin=(13.095085978, -9.525, -39.898979486), x_dir=(0, 0, 1), z_dir=(1, 0, 0)) * Cylinder(2, 341, mode=Mode.PRIVATE)
    add(fillet1_piece_6)


solid = part.part
